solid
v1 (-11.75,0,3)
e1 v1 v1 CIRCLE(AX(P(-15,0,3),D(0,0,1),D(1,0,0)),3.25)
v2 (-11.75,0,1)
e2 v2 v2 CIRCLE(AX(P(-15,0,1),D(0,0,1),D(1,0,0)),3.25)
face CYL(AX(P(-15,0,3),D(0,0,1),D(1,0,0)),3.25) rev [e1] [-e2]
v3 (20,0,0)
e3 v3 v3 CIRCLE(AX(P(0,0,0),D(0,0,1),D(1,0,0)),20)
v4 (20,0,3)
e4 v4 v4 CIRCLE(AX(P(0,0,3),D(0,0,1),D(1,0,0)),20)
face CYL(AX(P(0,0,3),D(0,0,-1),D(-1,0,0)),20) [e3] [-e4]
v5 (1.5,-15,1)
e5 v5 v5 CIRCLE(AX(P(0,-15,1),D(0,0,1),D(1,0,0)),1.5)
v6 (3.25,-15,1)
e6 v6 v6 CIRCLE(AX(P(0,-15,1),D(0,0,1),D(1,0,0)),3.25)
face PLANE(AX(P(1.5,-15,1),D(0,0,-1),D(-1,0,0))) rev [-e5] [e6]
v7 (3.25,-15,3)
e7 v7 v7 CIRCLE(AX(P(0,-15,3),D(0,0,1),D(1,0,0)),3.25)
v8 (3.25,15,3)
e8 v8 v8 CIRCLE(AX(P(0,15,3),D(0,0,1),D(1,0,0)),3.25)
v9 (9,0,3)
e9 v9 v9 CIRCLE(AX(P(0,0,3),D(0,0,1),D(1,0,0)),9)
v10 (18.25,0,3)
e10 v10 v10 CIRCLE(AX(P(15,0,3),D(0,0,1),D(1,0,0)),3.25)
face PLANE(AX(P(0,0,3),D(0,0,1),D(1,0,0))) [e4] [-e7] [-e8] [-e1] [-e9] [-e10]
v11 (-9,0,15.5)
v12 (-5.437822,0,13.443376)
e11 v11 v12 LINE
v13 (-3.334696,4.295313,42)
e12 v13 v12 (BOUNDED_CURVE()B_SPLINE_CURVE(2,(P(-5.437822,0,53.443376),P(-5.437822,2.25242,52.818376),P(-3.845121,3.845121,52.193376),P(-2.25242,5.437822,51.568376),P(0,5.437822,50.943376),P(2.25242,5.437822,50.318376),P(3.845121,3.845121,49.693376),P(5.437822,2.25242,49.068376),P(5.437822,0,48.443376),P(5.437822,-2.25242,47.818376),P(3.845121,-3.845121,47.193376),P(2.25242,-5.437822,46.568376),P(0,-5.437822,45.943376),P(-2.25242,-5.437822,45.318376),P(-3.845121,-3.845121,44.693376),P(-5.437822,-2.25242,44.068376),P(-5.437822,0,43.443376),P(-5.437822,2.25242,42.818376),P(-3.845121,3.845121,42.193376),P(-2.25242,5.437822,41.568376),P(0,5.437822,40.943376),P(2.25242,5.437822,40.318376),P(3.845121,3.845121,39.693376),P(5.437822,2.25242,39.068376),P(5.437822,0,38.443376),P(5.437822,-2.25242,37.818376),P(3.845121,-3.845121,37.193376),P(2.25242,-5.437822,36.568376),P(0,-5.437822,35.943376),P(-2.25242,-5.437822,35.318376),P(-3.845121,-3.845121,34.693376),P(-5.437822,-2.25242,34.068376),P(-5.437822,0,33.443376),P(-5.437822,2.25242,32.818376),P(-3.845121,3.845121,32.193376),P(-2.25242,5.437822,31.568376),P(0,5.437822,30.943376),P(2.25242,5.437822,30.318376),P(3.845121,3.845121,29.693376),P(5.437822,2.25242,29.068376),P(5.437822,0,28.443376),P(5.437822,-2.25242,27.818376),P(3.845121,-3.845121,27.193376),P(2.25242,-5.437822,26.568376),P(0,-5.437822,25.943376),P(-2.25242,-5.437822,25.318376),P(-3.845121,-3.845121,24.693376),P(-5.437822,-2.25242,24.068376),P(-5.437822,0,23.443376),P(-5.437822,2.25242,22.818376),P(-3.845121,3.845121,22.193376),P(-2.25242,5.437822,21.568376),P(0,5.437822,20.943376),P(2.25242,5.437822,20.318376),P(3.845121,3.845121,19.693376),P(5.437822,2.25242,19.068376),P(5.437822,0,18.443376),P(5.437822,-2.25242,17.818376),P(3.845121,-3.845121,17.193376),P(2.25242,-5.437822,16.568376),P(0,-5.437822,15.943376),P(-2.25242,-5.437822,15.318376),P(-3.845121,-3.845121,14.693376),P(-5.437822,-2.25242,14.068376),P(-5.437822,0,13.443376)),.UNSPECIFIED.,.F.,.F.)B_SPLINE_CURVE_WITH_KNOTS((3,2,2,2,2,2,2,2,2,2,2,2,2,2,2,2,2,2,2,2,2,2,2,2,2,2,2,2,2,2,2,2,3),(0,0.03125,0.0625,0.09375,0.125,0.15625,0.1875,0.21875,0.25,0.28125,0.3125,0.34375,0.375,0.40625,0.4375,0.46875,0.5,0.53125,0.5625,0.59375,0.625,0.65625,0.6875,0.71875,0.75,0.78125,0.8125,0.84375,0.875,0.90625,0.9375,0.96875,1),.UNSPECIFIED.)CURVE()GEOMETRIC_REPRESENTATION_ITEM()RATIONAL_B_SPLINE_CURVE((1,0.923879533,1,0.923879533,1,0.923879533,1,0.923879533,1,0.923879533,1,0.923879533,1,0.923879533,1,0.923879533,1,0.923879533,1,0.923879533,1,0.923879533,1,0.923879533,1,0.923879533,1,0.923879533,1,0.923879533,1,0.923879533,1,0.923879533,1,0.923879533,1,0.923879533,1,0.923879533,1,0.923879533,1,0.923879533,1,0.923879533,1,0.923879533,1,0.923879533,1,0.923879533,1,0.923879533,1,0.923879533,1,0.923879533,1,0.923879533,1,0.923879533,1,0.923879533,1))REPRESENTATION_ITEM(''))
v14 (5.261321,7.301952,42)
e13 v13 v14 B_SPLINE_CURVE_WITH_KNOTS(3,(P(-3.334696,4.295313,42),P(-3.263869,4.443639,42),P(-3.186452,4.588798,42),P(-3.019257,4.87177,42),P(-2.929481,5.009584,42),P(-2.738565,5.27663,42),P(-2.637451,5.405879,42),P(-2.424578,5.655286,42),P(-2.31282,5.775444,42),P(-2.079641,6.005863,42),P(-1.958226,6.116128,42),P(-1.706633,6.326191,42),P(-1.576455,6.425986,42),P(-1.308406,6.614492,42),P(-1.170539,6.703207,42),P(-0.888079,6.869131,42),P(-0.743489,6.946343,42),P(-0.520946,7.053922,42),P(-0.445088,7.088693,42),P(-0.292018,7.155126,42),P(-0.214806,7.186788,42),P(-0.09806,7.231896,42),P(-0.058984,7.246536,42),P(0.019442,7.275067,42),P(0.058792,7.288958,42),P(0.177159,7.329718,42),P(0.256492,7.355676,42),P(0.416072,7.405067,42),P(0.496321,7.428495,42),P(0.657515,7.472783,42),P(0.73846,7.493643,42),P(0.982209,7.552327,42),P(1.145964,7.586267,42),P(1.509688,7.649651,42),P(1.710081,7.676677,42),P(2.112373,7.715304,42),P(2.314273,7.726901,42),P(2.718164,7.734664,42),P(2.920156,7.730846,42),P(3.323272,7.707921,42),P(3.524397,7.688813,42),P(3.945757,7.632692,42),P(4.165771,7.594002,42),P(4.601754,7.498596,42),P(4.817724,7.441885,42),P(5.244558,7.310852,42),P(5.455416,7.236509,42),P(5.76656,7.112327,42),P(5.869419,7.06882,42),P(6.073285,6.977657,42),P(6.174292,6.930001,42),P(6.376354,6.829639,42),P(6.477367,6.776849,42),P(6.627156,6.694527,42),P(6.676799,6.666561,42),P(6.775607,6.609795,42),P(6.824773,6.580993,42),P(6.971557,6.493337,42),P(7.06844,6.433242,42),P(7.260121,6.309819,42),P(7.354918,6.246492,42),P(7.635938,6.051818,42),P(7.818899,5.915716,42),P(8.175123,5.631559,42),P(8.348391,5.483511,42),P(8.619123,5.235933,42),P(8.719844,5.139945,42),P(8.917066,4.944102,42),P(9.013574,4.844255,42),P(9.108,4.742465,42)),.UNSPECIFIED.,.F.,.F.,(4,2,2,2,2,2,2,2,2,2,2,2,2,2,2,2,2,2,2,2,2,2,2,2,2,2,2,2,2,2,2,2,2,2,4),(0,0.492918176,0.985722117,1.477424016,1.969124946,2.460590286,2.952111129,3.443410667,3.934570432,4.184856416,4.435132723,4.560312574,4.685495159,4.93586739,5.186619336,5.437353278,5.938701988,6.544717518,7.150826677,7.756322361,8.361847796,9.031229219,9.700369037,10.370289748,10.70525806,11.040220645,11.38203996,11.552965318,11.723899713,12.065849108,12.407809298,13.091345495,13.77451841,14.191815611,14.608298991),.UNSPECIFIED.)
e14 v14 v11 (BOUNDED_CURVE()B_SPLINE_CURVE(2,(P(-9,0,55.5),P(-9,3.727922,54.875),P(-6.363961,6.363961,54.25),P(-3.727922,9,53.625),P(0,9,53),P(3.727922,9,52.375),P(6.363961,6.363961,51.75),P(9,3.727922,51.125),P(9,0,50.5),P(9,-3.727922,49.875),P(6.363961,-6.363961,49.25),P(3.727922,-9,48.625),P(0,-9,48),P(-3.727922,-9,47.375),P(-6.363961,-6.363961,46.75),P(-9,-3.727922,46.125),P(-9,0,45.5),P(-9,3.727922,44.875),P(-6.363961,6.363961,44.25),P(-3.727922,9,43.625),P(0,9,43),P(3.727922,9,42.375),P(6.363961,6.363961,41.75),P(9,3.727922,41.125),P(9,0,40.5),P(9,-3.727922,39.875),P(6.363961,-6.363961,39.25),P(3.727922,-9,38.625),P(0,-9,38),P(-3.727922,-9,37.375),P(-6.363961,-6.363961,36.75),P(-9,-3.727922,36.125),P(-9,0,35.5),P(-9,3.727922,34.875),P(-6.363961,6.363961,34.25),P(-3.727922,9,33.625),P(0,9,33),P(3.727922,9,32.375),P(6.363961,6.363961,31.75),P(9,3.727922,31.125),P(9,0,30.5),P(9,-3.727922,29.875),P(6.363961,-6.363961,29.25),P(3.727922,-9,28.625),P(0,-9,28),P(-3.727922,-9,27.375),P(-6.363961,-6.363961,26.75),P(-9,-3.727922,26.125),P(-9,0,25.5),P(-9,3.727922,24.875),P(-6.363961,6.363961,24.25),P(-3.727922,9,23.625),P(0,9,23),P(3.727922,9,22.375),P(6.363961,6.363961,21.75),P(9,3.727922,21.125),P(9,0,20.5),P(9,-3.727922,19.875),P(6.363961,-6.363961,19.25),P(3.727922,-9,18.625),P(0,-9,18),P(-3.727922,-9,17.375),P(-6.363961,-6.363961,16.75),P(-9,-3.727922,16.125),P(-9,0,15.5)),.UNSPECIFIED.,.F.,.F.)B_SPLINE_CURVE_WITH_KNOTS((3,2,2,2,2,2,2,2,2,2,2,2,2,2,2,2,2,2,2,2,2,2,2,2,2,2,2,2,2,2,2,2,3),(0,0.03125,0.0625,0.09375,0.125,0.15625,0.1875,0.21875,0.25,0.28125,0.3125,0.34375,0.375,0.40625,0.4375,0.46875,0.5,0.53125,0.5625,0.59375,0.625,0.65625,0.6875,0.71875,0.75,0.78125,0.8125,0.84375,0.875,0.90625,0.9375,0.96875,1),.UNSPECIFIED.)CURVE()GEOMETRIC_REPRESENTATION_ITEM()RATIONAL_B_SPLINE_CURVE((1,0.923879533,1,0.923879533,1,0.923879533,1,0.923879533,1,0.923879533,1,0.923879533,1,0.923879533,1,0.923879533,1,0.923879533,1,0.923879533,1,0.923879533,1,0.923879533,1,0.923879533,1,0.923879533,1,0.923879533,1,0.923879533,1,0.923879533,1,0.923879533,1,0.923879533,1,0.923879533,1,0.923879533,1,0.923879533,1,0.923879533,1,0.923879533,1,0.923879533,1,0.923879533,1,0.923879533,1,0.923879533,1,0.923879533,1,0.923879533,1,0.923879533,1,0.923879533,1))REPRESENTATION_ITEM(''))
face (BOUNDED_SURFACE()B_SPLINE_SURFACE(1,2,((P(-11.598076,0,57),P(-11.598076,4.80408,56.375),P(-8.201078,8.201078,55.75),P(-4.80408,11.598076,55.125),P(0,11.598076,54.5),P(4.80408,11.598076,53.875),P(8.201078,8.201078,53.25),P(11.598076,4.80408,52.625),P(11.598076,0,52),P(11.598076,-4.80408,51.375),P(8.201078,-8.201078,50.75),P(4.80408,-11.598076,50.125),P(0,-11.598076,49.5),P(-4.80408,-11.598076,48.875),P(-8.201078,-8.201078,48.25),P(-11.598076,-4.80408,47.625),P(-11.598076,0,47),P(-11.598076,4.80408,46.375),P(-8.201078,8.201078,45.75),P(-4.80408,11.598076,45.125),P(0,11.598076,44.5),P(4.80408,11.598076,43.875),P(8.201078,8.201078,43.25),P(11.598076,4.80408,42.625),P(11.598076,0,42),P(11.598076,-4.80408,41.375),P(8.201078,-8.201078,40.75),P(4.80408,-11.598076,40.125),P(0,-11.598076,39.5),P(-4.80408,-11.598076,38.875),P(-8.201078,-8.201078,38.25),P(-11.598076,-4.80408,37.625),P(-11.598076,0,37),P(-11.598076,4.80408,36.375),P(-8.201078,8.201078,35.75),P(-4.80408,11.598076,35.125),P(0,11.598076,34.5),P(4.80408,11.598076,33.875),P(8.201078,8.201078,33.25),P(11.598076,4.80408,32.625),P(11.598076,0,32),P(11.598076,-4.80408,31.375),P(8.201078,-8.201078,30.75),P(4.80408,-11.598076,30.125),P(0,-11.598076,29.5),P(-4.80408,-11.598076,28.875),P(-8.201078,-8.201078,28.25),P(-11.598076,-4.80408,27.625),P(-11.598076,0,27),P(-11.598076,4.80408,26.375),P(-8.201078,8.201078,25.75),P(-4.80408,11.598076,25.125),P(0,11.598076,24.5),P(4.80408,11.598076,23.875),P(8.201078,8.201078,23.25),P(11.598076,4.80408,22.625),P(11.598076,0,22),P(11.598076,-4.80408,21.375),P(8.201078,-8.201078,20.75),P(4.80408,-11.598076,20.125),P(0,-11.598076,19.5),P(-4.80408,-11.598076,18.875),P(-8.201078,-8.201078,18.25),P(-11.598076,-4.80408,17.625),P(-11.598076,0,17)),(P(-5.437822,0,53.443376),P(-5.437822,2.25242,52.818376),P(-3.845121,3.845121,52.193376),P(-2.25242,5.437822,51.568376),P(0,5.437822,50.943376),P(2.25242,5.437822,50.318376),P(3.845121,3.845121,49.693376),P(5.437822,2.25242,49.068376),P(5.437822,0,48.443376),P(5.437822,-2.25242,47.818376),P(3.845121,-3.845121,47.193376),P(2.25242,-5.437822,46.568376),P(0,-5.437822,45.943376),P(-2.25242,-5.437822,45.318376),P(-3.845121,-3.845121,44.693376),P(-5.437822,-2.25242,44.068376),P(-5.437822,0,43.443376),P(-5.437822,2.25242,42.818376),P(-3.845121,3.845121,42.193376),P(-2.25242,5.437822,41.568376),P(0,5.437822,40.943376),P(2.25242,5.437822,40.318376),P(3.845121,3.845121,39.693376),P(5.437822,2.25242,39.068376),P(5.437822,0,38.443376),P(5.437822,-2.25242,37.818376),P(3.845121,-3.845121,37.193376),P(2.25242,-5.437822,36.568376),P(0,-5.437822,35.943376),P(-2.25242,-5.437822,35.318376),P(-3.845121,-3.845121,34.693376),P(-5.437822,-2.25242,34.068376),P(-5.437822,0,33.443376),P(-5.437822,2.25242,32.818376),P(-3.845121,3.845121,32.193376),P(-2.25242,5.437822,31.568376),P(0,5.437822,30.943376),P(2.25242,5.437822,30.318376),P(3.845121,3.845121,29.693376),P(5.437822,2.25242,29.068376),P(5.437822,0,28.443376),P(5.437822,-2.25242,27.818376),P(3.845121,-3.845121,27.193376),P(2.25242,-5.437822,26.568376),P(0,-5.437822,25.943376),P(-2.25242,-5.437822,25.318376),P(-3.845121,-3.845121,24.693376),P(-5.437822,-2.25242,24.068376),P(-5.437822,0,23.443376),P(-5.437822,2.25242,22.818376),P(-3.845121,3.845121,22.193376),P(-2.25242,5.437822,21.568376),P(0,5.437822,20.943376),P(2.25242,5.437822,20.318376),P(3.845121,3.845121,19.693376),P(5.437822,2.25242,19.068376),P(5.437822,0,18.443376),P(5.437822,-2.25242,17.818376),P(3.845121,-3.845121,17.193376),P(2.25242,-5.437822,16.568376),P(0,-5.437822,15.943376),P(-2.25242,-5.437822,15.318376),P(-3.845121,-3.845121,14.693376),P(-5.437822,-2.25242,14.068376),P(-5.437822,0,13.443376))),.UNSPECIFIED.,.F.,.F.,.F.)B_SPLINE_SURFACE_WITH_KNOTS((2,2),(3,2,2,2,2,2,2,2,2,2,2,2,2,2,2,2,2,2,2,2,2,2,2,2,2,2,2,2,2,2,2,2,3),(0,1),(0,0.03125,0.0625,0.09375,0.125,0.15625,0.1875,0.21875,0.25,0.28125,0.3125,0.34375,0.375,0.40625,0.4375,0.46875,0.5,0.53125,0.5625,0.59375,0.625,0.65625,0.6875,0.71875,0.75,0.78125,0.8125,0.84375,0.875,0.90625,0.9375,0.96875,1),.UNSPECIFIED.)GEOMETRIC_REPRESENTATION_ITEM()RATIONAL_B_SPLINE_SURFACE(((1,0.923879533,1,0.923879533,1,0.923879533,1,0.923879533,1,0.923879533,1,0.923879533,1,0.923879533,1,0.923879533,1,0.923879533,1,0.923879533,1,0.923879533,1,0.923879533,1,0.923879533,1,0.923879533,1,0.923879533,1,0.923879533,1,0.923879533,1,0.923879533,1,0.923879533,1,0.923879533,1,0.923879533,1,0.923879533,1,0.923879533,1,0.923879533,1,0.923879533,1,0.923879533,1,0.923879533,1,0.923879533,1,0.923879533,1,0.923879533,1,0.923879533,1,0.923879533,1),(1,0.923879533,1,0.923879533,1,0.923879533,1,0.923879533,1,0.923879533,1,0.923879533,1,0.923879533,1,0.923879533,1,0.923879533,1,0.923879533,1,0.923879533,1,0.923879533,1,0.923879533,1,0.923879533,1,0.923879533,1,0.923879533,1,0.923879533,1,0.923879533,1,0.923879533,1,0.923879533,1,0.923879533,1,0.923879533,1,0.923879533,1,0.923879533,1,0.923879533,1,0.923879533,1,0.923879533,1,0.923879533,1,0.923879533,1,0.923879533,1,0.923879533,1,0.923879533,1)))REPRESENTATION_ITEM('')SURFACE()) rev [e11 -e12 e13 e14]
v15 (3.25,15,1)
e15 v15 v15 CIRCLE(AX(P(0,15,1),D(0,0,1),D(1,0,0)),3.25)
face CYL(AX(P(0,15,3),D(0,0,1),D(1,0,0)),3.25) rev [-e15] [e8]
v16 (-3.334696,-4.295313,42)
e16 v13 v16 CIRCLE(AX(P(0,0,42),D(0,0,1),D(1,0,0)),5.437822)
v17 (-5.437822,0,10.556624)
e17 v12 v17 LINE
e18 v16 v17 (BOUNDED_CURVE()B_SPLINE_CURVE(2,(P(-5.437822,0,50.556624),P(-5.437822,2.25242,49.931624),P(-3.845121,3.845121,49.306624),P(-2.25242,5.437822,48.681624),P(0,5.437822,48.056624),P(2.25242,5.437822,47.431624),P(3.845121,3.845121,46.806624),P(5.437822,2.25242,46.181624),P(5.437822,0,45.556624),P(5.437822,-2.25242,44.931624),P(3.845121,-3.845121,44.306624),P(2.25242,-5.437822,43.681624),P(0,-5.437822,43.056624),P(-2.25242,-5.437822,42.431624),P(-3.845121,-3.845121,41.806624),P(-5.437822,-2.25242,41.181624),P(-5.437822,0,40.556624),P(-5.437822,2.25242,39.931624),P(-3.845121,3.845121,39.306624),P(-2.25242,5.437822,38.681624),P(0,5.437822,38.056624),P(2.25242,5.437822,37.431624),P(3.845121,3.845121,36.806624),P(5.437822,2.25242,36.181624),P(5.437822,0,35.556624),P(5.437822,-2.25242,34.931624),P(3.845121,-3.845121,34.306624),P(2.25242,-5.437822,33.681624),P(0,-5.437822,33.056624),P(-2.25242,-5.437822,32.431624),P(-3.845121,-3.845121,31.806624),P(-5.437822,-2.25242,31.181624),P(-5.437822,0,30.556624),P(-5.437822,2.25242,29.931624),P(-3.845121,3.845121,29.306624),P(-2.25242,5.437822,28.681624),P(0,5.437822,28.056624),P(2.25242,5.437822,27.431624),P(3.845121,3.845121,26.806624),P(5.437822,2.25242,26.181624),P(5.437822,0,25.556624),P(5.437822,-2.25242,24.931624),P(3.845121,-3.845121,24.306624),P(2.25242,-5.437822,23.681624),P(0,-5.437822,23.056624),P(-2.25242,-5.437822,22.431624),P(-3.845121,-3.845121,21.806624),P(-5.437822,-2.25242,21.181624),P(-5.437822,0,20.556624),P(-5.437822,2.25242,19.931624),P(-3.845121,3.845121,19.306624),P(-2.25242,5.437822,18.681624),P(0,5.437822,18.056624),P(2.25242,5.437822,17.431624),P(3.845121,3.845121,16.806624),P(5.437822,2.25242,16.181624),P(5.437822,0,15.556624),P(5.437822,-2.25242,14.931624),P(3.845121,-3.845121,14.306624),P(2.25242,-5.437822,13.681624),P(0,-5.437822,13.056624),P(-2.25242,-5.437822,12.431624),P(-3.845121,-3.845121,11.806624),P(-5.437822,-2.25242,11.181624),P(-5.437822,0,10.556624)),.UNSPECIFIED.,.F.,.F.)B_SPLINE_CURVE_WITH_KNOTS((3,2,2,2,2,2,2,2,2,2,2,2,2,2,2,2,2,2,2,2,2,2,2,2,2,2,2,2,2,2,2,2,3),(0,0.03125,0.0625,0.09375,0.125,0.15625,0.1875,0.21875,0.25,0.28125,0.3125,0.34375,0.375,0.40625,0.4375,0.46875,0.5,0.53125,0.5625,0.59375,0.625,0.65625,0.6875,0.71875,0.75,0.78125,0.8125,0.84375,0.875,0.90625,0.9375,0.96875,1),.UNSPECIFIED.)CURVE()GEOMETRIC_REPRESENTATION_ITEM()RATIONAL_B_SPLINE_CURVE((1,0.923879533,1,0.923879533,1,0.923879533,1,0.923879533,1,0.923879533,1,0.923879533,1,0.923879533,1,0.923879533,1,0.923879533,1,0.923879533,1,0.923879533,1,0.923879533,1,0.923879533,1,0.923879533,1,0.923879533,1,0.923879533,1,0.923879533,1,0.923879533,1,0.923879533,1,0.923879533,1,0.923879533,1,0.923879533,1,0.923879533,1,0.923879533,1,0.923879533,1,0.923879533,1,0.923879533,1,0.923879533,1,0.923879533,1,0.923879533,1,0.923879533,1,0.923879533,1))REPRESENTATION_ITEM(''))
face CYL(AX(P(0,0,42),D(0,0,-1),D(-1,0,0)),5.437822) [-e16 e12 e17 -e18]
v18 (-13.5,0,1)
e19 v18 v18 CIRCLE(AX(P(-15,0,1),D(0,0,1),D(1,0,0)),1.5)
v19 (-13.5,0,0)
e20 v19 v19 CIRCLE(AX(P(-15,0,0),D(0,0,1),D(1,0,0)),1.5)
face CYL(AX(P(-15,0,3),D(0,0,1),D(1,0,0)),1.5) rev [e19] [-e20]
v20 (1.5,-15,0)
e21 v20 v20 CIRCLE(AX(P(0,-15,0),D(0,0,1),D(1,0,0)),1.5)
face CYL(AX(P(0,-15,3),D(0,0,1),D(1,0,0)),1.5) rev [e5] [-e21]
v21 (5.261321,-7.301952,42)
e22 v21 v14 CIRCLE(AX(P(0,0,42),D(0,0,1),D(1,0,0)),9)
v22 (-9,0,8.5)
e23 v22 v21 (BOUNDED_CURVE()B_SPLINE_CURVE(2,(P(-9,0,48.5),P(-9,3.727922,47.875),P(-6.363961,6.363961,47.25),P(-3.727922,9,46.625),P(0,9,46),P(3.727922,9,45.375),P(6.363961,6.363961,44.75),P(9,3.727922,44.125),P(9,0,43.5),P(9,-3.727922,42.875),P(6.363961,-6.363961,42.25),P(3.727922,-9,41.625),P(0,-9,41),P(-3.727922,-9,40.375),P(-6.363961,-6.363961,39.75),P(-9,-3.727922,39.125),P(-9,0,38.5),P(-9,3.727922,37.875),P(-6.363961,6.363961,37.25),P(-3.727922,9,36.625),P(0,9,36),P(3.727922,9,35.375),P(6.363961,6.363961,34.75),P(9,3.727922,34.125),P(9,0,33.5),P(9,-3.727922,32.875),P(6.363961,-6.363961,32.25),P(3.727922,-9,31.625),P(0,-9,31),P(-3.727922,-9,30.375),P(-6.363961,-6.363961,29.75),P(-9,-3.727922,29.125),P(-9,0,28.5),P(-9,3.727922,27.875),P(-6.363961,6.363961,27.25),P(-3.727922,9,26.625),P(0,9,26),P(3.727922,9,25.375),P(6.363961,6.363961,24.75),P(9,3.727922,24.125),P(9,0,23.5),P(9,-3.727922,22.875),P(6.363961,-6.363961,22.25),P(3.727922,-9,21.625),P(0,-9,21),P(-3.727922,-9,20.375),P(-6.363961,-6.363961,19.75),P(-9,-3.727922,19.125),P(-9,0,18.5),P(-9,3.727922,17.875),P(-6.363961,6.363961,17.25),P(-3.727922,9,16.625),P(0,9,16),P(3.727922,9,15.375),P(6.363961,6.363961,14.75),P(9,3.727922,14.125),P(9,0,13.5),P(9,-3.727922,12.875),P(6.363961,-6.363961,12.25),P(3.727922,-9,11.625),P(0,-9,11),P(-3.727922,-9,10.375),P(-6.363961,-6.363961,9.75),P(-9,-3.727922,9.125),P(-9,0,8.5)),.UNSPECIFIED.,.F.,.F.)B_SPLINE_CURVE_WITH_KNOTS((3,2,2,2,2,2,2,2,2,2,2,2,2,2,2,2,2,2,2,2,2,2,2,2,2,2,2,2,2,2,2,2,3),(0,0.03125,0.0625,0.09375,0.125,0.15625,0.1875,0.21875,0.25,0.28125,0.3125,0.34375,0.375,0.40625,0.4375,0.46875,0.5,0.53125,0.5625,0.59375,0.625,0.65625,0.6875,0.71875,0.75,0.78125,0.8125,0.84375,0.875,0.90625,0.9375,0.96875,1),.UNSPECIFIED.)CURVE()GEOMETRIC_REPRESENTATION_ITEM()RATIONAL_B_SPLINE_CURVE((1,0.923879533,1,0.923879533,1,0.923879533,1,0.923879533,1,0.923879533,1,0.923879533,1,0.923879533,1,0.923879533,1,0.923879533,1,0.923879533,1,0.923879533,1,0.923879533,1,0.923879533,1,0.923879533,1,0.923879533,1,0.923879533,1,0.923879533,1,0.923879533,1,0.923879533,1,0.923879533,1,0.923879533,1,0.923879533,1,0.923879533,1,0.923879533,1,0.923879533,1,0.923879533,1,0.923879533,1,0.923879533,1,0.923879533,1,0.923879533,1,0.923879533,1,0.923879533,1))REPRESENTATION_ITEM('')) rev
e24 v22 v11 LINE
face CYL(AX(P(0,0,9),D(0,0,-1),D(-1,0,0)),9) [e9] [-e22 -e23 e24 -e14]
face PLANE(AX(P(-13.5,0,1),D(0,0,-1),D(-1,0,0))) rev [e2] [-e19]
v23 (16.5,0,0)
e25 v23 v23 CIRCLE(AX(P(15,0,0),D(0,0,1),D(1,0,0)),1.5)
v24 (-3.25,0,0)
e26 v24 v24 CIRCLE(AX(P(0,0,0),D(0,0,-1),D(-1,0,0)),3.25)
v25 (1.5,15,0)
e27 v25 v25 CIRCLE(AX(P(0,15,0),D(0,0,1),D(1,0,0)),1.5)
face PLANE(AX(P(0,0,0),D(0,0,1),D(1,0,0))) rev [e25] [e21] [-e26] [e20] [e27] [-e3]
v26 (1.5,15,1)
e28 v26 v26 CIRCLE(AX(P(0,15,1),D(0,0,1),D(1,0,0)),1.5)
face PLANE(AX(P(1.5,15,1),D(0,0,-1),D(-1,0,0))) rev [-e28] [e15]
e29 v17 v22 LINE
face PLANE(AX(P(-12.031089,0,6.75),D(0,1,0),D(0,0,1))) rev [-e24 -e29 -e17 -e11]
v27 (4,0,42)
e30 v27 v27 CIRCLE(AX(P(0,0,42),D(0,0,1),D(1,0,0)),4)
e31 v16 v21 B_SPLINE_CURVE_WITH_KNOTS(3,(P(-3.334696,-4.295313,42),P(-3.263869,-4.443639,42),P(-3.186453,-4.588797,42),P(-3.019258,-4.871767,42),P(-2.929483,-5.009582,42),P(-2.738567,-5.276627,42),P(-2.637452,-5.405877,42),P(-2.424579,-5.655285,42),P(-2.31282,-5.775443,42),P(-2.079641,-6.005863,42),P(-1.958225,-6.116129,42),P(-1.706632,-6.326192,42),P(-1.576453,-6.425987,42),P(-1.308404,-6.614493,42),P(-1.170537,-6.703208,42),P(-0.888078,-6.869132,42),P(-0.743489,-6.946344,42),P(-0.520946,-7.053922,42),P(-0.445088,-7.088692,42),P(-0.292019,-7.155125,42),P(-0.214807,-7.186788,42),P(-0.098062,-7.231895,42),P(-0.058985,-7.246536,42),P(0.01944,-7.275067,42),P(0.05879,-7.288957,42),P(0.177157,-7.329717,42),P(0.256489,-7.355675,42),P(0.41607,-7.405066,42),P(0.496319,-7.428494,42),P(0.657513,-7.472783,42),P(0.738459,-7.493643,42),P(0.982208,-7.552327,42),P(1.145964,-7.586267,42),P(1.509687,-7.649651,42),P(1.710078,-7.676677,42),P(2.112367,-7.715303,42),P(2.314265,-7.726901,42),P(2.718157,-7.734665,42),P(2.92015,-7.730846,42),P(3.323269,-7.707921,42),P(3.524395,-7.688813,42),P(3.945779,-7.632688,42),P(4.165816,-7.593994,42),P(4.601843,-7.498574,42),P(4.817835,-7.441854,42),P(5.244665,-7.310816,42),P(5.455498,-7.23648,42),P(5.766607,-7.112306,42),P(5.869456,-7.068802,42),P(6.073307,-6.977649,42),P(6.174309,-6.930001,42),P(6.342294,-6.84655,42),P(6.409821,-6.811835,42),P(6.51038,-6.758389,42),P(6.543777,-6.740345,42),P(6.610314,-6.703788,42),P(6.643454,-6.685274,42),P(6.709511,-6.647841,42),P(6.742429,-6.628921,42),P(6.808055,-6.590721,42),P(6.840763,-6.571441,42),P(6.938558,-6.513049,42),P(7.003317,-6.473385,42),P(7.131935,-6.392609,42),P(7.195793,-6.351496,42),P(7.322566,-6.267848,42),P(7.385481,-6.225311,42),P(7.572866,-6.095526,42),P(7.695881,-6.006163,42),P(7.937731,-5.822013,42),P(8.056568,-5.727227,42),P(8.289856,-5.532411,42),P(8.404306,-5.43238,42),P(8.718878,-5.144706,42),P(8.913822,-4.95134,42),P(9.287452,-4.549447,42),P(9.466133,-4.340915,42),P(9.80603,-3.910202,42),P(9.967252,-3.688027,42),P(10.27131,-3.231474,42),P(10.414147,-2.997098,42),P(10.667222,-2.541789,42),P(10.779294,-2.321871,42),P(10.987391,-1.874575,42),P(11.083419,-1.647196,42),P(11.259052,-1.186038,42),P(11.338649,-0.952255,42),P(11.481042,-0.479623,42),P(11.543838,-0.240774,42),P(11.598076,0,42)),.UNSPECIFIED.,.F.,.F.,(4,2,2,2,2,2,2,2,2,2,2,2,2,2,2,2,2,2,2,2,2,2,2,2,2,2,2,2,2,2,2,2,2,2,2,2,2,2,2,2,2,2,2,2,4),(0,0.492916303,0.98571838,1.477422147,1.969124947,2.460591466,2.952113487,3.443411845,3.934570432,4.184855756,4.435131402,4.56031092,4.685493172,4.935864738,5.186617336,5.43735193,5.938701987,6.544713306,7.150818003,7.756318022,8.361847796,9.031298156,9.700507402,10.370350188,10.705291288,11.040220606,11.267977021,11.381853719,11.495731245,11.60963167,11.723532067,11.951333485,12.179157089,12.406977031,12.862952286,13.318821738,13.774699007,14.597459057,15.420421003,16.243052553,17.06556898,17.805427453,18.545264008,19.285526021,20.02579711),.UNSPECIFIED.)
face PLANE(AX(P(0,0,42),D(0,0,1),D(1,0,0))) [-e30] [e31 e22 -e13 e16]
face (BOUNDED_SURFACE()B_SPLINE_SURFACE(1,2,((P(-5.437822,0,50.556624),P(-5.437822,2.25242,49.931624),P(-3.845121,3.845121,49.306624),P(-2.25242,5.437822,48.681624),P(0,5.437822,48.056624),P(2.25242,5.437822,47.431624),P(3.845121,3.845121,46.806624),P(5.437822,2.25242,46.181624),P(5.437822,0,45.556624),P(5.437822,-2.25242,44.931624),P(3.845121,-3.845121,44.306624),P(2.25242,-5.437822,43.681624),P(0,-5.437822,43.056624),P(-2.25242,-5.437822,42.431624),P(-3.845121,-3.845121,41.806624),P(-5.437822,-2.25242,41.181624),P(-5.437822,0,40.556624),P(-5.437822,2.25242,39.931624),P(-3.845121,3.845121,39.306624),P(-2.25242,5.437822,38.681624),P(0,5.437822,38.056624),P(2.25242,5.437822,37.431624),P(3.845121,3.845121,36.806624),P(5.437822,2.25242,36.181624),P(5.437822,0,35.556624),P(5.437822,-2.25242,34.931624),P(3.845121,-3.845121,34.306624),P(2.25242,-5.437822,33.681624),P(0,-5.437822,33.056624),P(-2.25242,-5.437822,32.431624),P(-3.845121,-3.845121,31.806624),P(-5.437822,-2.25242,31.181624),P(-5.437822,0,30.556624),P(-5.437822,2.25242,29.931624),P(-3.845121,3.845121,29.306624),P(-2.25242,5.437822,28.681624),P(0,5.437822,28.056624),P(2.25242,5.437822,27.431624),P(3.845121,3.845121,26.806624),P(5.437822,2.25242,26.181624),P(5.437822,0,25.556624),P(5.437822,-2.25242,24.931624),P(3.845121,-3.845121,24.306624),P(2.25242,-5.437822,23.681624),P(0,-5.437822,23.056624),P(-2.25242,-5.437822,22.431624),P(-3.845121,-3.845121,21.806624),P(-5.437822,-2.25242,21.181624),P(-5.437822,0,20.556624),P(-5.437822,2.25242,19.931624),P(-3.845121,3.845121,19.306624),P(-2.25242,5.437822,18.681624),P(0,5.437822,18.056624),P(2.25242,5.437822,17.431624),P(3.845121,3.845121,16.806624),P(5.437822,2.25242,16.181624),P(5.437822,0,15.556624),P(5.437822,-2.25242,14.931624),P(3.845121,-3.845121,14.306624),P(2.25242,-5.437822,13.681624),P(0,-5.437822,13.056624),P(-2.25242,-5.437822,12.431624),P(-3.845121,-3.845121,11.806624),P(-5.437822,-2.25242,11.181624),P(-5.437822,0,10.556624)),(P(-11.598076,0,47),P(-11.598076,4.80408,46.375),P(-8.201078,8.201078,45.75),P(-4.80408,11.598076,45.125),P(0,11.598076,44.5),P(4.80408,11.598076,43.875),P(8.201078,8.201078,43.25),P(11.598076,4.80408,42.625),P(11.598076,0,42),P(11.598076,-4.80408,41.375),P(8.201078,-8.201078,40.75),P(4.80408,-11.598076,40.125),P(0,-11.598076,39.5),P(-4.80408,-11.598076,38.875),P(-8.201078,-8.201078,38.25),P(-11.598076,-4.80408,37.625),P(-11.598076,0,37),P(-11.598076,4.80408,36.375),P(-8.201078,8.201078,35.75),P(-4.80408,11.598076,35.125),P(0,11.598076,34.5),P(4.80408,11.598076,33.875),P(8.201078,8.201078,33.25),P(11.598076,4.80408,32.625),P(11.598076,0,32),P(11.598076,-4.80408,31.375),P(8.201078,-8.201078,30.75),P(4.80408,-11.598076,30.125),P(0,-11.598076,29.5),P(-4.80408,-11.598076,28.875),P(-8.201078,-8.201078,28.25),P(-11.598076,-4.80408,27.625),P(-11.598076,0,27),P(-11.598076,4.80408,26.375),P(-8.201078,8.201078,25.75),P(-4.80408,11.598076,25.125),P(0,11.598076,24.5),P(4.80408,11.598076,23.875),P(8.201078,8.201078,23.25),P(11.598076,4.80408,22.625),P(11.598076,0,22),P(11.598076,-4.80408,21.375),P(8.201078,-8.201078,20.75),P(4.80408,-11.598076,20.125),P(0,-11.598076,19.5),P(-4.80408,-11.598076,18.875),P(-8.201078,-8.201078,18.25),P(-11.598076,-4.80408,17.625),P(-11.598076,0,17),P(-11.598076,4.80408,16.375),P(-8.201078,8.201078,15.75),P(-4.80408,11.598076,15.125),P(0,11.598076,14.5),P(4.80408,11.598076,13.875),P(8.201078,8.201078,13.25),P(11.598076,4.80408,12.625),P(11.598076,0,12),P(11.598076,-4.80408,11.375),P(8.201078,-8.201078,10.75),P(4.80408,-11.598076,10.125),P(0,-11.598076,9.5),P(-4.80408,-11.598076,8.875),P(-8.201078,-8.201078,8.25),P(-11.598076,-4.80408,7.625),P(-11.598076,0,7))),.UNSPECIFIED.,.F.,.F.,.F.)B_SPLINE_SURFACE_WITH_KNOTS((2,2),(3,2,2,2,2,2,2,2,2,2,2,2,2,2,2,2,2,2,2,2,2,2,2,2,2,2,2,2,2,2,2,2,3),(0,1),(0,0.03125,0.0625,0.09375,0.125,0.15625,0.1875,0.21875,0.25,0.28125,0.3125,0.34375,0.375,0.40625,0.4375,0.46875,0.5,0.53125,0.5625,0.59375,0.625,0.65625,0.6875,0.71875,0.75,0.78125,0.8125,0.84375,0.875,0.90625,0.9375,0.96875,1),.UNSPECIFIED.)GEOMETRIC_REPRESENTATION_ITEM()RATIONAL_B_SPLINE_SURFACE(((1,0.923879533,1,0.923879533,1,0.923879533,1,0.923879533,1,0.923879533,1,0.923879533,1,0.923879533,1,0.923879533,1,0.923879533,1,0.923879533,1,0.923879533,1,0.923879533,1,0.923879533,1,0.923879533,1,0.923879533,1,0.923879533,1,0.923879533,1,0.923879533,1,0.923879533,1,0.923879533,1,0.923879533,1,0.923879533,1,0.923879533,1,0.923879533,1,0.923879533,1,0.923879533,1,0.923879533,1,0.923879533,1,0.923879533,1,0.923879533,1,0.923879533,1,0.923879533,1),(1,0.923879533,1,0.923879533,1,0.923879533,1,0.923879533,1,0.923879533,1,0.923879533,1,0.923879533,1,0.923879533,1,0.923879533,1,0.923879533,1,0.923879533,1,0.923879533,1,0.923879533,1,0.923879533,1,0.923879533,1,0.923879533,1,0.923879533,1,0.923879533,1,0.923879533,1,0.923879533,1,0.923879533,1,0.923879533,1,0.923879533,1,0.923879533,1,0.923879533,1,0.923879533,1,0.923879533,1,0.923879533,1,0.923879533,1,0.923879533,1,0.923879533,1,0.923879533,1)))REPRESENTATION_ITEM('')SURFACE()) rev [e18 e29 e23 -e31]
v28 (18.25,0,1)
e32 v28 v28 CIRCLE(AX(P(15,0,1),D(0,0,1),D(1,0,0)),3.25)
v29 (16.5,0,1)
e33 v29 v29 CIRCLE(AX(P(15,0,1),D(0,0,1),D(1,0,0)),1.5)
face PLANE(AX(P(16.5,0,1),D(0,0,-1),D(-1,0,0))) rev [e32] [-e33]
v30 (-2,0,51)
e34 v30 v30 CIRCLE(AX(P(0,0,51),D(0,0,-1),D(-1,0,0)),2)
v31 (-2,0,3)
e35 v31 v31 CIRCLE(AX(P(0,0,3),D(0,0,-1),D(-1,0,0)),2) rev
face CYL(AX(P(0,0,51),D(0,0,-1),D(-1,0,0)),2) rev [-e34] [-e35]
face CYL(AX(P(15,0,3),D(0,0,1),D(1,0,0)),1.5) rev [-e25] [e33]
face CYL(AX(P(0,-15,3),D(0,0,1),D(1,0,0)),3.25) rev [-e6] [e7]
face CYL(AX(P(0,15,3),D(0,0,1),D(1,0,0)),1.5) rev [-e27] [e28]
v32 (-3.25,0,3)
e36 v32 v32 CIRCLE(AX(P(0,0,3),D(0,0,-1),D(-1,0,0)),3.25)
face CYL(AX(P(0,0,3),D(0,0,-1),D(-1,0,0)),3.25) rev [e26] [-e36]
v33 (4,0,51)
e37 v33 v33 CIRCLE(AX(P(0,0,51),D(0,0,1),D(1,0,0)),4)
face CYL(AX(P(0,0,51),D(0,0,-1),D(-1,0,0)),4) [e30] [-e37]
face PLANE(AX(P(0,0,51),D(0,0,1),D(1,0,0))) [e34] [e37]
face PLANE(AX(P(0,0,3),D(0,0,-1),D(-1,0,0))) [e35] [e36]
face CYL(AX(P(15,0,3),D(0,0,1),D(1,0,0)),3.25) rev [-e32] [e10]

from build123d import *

# Parameters (mm, degrees)
SKETCH1_R                                        = 20
EXTRUDE1_DEPTH                                   = 3
SKETCH2_R                                        = 9
EXTRUDE2_DEPTH                                   = 6
SKETCH3_R                                        = 9
EXTRUDE3_DEPTH                                   = 33
CUT_SWEEP1_PITCH                                 = 10
SKETCH6_R                                        = 4
EXTRUDE4_DEPTH                                   = 9
CBORE_FOR_M3_PAN_HEAD_MACHINE_SCREW1_D           = 3
CBORE_FOR_M3_PAN_HEAD_MACHINE_SCREW1_CBORE_D     = 6.5
CBORE_FOR_M3_PAN_HEAD_MACHINE_SCREW1_CBORE_DEPTH = 2
SKETCH8_R                                        = 2
EXTRUDE5_DEPTH                                   = 59.318093247
SKETCH9_R                                        = 3.25
EXTRUDE6_DEPTH                                   = 3


with BuildPart() as part:
    # Sketch1 → Extrude1 (new body)
    with BuildSketch(Plane.XY):
        Circle(SKETCH1_R)
    extrude(amount=EXTRUDE1_DEPTH)

    # Sketch2 → Extrude2 (add)
    with BuildSketch(Plane.XY.offset(3)):
        Circle(SKETCH2_R)
    extrude(amount=EXTRUDE2_DEPTH)

    # Sketch3 → Extrude3 (add)
    with BuildSketch(Plane.XY.offset(9)):
        Circle(SKETCH3_R)
    extrude(amount=EXTRUDE3_DEPTH)

    # Cut-Sweep1: arcs per turn and ends read off the stored shape
    # Cut-Sweep1: the profile of Sketch5 screwed along a right-hand helix through 4 turns, 8 arcs to a turn; built about Z, then put on its axis
    cut_sweep1_z = Axis((0, 0, 0), (0, 0, 1))
    cut_sweep1_corners = [(5.437822174, 0, -8.556624327), (5.437822174, 0, -11.443375673), (12.031088913, 0, -15.25), (12.031088913, 0, -4.75)]
    with BuildLine(mode=Mode.PRIVATE) as cut_sweep1_profile:
        Line(cut_sweep1_corners[0], cut_sweep1_corners[1])
        Line(cut_sweep1_corners[1], cut_sweep1_corners[2])
        Line(cut_sweep1_corners[2], cut_sweep1_corners[3])
        Line(cut_sweep1_corners[3], cut_sweep1_corners[0])
    cut_sweep1_cap = Face(cut_sweep1_profile.wire())
    cut_sweep1_turn_angles = [0, 22.5, 45, 67.5, 90, 112.5, 135, 157.5, 180, 202.5, 225, 247.5, 270, 292.5, 315, 337.5, 360]
    cut_sweep1_turn_weights = [1, 0.9238795325112867, 1, 0.9238795325112867, 1, 0.9238795325112867, 1, 0.9238795325112867, 1, 0.9238795325112867, 1, 0.9238795325112867, 1, 0.9238795325112867, 1, 0.9238795325112867, 1]
    cut_sweep1_turn_rails = [Edge.make_bspline([Vector(p[0], p[1], 0).rotate(cut_sweep1_z, cut_sweep1_turn_angles[k]) / cut_sweep1_turn_weights[k] + Vector(0, 0, p[2] + CUT_SWEEP1_PITCH * cut_sweep1_turn_angles[k] / 360) for k in range(17)], [0, 0, 0, 1, 1, 2, 2, 3, 3, 4, 4, 5, 5, 6, 6, 7, 7, 8, 8, 8], 2, cut_sweep1_turn_weights) for p in cut_sweep1_corners]
    cut_sweep1_turn_sides = [Face.make_surface_from_curves(cut_sweep1_turn_rails[p[0]], cut_sweep1_turn_rails[p[1]]) for p in [(0, 1), (1, 2), (2, 3), (3, 0)]]
    cut_sweep1 = Plane(origin=(0, 0, 42), x_dir=(-1, 0, 0), z_dir=(0, 0, -1)) * Solid(Shell([*[p.moved(Location((0, 0, CUT_SWEEP1_PITCH * i))) for i in range(4) for p in cut_sweep1_turn_sides], cut_sweep1_cap, cut_sweep1_cap.rotate(cut_sweep1_z, 1440).moved(Location((0, 0, CUT_SWEEP1_PITCH * 1440 / 360)))]))
    add(cut_sweep1, mode=Mode.SUBTRACT)

    # Sketch6 → Extrude4 (add)
    with BuildSketch(Plane.XY.offset(42)):
        Circle(SKETCH6_R)
    extrude(amount=EXTRUDE4_DEPTH)

    # CBORE for M3 Pan Head Machine Screw1 (through all)
    with Locations(Plane(origin=(15, 0, 3), x_dir=(1, 0, 0), z_dir=(0, 0, 1))):
        with Locations((0, 0), (-15, -15), (-30, 0), (-15, 15)):
            CounterBoreHole(CBORE_FOR_M3_PAN_HEAD_MACHINE_SCREW1_D / 2, CBORE_FOR_M3_PAN_HEAD_MACHINE_SCREW1_CBORE_D / 2, CBORE_FOR_M3_PAN_HEAD_MACHINE_SCREW1_CBORE_DEPTH)

    # Sketch8 → Extrude5 (cut, through all)
    with BuildSketch(Plane(origin=(0, 0, 0), x_dir=(-1, 0, 0), z_dir=(0, 0, -1))):
        Circle(SKETCH8_R)
    extrude(amount=-EXTRUDE5_DEPTH, mode=Mode.SUBTRACT)

    # Sketch9 → Extrude6 (cut)
    with BuildSketch(Plane(origin=(0, 0, 0), x_dir=(-1, 0, 0), z_dir=(0, 0, -1))):
        Circle(SKETCH9_R)
    extrude(amount=-EXTRUDE6_DEPTH, mode=Mode.SUBTRACT)


solid = part.part
